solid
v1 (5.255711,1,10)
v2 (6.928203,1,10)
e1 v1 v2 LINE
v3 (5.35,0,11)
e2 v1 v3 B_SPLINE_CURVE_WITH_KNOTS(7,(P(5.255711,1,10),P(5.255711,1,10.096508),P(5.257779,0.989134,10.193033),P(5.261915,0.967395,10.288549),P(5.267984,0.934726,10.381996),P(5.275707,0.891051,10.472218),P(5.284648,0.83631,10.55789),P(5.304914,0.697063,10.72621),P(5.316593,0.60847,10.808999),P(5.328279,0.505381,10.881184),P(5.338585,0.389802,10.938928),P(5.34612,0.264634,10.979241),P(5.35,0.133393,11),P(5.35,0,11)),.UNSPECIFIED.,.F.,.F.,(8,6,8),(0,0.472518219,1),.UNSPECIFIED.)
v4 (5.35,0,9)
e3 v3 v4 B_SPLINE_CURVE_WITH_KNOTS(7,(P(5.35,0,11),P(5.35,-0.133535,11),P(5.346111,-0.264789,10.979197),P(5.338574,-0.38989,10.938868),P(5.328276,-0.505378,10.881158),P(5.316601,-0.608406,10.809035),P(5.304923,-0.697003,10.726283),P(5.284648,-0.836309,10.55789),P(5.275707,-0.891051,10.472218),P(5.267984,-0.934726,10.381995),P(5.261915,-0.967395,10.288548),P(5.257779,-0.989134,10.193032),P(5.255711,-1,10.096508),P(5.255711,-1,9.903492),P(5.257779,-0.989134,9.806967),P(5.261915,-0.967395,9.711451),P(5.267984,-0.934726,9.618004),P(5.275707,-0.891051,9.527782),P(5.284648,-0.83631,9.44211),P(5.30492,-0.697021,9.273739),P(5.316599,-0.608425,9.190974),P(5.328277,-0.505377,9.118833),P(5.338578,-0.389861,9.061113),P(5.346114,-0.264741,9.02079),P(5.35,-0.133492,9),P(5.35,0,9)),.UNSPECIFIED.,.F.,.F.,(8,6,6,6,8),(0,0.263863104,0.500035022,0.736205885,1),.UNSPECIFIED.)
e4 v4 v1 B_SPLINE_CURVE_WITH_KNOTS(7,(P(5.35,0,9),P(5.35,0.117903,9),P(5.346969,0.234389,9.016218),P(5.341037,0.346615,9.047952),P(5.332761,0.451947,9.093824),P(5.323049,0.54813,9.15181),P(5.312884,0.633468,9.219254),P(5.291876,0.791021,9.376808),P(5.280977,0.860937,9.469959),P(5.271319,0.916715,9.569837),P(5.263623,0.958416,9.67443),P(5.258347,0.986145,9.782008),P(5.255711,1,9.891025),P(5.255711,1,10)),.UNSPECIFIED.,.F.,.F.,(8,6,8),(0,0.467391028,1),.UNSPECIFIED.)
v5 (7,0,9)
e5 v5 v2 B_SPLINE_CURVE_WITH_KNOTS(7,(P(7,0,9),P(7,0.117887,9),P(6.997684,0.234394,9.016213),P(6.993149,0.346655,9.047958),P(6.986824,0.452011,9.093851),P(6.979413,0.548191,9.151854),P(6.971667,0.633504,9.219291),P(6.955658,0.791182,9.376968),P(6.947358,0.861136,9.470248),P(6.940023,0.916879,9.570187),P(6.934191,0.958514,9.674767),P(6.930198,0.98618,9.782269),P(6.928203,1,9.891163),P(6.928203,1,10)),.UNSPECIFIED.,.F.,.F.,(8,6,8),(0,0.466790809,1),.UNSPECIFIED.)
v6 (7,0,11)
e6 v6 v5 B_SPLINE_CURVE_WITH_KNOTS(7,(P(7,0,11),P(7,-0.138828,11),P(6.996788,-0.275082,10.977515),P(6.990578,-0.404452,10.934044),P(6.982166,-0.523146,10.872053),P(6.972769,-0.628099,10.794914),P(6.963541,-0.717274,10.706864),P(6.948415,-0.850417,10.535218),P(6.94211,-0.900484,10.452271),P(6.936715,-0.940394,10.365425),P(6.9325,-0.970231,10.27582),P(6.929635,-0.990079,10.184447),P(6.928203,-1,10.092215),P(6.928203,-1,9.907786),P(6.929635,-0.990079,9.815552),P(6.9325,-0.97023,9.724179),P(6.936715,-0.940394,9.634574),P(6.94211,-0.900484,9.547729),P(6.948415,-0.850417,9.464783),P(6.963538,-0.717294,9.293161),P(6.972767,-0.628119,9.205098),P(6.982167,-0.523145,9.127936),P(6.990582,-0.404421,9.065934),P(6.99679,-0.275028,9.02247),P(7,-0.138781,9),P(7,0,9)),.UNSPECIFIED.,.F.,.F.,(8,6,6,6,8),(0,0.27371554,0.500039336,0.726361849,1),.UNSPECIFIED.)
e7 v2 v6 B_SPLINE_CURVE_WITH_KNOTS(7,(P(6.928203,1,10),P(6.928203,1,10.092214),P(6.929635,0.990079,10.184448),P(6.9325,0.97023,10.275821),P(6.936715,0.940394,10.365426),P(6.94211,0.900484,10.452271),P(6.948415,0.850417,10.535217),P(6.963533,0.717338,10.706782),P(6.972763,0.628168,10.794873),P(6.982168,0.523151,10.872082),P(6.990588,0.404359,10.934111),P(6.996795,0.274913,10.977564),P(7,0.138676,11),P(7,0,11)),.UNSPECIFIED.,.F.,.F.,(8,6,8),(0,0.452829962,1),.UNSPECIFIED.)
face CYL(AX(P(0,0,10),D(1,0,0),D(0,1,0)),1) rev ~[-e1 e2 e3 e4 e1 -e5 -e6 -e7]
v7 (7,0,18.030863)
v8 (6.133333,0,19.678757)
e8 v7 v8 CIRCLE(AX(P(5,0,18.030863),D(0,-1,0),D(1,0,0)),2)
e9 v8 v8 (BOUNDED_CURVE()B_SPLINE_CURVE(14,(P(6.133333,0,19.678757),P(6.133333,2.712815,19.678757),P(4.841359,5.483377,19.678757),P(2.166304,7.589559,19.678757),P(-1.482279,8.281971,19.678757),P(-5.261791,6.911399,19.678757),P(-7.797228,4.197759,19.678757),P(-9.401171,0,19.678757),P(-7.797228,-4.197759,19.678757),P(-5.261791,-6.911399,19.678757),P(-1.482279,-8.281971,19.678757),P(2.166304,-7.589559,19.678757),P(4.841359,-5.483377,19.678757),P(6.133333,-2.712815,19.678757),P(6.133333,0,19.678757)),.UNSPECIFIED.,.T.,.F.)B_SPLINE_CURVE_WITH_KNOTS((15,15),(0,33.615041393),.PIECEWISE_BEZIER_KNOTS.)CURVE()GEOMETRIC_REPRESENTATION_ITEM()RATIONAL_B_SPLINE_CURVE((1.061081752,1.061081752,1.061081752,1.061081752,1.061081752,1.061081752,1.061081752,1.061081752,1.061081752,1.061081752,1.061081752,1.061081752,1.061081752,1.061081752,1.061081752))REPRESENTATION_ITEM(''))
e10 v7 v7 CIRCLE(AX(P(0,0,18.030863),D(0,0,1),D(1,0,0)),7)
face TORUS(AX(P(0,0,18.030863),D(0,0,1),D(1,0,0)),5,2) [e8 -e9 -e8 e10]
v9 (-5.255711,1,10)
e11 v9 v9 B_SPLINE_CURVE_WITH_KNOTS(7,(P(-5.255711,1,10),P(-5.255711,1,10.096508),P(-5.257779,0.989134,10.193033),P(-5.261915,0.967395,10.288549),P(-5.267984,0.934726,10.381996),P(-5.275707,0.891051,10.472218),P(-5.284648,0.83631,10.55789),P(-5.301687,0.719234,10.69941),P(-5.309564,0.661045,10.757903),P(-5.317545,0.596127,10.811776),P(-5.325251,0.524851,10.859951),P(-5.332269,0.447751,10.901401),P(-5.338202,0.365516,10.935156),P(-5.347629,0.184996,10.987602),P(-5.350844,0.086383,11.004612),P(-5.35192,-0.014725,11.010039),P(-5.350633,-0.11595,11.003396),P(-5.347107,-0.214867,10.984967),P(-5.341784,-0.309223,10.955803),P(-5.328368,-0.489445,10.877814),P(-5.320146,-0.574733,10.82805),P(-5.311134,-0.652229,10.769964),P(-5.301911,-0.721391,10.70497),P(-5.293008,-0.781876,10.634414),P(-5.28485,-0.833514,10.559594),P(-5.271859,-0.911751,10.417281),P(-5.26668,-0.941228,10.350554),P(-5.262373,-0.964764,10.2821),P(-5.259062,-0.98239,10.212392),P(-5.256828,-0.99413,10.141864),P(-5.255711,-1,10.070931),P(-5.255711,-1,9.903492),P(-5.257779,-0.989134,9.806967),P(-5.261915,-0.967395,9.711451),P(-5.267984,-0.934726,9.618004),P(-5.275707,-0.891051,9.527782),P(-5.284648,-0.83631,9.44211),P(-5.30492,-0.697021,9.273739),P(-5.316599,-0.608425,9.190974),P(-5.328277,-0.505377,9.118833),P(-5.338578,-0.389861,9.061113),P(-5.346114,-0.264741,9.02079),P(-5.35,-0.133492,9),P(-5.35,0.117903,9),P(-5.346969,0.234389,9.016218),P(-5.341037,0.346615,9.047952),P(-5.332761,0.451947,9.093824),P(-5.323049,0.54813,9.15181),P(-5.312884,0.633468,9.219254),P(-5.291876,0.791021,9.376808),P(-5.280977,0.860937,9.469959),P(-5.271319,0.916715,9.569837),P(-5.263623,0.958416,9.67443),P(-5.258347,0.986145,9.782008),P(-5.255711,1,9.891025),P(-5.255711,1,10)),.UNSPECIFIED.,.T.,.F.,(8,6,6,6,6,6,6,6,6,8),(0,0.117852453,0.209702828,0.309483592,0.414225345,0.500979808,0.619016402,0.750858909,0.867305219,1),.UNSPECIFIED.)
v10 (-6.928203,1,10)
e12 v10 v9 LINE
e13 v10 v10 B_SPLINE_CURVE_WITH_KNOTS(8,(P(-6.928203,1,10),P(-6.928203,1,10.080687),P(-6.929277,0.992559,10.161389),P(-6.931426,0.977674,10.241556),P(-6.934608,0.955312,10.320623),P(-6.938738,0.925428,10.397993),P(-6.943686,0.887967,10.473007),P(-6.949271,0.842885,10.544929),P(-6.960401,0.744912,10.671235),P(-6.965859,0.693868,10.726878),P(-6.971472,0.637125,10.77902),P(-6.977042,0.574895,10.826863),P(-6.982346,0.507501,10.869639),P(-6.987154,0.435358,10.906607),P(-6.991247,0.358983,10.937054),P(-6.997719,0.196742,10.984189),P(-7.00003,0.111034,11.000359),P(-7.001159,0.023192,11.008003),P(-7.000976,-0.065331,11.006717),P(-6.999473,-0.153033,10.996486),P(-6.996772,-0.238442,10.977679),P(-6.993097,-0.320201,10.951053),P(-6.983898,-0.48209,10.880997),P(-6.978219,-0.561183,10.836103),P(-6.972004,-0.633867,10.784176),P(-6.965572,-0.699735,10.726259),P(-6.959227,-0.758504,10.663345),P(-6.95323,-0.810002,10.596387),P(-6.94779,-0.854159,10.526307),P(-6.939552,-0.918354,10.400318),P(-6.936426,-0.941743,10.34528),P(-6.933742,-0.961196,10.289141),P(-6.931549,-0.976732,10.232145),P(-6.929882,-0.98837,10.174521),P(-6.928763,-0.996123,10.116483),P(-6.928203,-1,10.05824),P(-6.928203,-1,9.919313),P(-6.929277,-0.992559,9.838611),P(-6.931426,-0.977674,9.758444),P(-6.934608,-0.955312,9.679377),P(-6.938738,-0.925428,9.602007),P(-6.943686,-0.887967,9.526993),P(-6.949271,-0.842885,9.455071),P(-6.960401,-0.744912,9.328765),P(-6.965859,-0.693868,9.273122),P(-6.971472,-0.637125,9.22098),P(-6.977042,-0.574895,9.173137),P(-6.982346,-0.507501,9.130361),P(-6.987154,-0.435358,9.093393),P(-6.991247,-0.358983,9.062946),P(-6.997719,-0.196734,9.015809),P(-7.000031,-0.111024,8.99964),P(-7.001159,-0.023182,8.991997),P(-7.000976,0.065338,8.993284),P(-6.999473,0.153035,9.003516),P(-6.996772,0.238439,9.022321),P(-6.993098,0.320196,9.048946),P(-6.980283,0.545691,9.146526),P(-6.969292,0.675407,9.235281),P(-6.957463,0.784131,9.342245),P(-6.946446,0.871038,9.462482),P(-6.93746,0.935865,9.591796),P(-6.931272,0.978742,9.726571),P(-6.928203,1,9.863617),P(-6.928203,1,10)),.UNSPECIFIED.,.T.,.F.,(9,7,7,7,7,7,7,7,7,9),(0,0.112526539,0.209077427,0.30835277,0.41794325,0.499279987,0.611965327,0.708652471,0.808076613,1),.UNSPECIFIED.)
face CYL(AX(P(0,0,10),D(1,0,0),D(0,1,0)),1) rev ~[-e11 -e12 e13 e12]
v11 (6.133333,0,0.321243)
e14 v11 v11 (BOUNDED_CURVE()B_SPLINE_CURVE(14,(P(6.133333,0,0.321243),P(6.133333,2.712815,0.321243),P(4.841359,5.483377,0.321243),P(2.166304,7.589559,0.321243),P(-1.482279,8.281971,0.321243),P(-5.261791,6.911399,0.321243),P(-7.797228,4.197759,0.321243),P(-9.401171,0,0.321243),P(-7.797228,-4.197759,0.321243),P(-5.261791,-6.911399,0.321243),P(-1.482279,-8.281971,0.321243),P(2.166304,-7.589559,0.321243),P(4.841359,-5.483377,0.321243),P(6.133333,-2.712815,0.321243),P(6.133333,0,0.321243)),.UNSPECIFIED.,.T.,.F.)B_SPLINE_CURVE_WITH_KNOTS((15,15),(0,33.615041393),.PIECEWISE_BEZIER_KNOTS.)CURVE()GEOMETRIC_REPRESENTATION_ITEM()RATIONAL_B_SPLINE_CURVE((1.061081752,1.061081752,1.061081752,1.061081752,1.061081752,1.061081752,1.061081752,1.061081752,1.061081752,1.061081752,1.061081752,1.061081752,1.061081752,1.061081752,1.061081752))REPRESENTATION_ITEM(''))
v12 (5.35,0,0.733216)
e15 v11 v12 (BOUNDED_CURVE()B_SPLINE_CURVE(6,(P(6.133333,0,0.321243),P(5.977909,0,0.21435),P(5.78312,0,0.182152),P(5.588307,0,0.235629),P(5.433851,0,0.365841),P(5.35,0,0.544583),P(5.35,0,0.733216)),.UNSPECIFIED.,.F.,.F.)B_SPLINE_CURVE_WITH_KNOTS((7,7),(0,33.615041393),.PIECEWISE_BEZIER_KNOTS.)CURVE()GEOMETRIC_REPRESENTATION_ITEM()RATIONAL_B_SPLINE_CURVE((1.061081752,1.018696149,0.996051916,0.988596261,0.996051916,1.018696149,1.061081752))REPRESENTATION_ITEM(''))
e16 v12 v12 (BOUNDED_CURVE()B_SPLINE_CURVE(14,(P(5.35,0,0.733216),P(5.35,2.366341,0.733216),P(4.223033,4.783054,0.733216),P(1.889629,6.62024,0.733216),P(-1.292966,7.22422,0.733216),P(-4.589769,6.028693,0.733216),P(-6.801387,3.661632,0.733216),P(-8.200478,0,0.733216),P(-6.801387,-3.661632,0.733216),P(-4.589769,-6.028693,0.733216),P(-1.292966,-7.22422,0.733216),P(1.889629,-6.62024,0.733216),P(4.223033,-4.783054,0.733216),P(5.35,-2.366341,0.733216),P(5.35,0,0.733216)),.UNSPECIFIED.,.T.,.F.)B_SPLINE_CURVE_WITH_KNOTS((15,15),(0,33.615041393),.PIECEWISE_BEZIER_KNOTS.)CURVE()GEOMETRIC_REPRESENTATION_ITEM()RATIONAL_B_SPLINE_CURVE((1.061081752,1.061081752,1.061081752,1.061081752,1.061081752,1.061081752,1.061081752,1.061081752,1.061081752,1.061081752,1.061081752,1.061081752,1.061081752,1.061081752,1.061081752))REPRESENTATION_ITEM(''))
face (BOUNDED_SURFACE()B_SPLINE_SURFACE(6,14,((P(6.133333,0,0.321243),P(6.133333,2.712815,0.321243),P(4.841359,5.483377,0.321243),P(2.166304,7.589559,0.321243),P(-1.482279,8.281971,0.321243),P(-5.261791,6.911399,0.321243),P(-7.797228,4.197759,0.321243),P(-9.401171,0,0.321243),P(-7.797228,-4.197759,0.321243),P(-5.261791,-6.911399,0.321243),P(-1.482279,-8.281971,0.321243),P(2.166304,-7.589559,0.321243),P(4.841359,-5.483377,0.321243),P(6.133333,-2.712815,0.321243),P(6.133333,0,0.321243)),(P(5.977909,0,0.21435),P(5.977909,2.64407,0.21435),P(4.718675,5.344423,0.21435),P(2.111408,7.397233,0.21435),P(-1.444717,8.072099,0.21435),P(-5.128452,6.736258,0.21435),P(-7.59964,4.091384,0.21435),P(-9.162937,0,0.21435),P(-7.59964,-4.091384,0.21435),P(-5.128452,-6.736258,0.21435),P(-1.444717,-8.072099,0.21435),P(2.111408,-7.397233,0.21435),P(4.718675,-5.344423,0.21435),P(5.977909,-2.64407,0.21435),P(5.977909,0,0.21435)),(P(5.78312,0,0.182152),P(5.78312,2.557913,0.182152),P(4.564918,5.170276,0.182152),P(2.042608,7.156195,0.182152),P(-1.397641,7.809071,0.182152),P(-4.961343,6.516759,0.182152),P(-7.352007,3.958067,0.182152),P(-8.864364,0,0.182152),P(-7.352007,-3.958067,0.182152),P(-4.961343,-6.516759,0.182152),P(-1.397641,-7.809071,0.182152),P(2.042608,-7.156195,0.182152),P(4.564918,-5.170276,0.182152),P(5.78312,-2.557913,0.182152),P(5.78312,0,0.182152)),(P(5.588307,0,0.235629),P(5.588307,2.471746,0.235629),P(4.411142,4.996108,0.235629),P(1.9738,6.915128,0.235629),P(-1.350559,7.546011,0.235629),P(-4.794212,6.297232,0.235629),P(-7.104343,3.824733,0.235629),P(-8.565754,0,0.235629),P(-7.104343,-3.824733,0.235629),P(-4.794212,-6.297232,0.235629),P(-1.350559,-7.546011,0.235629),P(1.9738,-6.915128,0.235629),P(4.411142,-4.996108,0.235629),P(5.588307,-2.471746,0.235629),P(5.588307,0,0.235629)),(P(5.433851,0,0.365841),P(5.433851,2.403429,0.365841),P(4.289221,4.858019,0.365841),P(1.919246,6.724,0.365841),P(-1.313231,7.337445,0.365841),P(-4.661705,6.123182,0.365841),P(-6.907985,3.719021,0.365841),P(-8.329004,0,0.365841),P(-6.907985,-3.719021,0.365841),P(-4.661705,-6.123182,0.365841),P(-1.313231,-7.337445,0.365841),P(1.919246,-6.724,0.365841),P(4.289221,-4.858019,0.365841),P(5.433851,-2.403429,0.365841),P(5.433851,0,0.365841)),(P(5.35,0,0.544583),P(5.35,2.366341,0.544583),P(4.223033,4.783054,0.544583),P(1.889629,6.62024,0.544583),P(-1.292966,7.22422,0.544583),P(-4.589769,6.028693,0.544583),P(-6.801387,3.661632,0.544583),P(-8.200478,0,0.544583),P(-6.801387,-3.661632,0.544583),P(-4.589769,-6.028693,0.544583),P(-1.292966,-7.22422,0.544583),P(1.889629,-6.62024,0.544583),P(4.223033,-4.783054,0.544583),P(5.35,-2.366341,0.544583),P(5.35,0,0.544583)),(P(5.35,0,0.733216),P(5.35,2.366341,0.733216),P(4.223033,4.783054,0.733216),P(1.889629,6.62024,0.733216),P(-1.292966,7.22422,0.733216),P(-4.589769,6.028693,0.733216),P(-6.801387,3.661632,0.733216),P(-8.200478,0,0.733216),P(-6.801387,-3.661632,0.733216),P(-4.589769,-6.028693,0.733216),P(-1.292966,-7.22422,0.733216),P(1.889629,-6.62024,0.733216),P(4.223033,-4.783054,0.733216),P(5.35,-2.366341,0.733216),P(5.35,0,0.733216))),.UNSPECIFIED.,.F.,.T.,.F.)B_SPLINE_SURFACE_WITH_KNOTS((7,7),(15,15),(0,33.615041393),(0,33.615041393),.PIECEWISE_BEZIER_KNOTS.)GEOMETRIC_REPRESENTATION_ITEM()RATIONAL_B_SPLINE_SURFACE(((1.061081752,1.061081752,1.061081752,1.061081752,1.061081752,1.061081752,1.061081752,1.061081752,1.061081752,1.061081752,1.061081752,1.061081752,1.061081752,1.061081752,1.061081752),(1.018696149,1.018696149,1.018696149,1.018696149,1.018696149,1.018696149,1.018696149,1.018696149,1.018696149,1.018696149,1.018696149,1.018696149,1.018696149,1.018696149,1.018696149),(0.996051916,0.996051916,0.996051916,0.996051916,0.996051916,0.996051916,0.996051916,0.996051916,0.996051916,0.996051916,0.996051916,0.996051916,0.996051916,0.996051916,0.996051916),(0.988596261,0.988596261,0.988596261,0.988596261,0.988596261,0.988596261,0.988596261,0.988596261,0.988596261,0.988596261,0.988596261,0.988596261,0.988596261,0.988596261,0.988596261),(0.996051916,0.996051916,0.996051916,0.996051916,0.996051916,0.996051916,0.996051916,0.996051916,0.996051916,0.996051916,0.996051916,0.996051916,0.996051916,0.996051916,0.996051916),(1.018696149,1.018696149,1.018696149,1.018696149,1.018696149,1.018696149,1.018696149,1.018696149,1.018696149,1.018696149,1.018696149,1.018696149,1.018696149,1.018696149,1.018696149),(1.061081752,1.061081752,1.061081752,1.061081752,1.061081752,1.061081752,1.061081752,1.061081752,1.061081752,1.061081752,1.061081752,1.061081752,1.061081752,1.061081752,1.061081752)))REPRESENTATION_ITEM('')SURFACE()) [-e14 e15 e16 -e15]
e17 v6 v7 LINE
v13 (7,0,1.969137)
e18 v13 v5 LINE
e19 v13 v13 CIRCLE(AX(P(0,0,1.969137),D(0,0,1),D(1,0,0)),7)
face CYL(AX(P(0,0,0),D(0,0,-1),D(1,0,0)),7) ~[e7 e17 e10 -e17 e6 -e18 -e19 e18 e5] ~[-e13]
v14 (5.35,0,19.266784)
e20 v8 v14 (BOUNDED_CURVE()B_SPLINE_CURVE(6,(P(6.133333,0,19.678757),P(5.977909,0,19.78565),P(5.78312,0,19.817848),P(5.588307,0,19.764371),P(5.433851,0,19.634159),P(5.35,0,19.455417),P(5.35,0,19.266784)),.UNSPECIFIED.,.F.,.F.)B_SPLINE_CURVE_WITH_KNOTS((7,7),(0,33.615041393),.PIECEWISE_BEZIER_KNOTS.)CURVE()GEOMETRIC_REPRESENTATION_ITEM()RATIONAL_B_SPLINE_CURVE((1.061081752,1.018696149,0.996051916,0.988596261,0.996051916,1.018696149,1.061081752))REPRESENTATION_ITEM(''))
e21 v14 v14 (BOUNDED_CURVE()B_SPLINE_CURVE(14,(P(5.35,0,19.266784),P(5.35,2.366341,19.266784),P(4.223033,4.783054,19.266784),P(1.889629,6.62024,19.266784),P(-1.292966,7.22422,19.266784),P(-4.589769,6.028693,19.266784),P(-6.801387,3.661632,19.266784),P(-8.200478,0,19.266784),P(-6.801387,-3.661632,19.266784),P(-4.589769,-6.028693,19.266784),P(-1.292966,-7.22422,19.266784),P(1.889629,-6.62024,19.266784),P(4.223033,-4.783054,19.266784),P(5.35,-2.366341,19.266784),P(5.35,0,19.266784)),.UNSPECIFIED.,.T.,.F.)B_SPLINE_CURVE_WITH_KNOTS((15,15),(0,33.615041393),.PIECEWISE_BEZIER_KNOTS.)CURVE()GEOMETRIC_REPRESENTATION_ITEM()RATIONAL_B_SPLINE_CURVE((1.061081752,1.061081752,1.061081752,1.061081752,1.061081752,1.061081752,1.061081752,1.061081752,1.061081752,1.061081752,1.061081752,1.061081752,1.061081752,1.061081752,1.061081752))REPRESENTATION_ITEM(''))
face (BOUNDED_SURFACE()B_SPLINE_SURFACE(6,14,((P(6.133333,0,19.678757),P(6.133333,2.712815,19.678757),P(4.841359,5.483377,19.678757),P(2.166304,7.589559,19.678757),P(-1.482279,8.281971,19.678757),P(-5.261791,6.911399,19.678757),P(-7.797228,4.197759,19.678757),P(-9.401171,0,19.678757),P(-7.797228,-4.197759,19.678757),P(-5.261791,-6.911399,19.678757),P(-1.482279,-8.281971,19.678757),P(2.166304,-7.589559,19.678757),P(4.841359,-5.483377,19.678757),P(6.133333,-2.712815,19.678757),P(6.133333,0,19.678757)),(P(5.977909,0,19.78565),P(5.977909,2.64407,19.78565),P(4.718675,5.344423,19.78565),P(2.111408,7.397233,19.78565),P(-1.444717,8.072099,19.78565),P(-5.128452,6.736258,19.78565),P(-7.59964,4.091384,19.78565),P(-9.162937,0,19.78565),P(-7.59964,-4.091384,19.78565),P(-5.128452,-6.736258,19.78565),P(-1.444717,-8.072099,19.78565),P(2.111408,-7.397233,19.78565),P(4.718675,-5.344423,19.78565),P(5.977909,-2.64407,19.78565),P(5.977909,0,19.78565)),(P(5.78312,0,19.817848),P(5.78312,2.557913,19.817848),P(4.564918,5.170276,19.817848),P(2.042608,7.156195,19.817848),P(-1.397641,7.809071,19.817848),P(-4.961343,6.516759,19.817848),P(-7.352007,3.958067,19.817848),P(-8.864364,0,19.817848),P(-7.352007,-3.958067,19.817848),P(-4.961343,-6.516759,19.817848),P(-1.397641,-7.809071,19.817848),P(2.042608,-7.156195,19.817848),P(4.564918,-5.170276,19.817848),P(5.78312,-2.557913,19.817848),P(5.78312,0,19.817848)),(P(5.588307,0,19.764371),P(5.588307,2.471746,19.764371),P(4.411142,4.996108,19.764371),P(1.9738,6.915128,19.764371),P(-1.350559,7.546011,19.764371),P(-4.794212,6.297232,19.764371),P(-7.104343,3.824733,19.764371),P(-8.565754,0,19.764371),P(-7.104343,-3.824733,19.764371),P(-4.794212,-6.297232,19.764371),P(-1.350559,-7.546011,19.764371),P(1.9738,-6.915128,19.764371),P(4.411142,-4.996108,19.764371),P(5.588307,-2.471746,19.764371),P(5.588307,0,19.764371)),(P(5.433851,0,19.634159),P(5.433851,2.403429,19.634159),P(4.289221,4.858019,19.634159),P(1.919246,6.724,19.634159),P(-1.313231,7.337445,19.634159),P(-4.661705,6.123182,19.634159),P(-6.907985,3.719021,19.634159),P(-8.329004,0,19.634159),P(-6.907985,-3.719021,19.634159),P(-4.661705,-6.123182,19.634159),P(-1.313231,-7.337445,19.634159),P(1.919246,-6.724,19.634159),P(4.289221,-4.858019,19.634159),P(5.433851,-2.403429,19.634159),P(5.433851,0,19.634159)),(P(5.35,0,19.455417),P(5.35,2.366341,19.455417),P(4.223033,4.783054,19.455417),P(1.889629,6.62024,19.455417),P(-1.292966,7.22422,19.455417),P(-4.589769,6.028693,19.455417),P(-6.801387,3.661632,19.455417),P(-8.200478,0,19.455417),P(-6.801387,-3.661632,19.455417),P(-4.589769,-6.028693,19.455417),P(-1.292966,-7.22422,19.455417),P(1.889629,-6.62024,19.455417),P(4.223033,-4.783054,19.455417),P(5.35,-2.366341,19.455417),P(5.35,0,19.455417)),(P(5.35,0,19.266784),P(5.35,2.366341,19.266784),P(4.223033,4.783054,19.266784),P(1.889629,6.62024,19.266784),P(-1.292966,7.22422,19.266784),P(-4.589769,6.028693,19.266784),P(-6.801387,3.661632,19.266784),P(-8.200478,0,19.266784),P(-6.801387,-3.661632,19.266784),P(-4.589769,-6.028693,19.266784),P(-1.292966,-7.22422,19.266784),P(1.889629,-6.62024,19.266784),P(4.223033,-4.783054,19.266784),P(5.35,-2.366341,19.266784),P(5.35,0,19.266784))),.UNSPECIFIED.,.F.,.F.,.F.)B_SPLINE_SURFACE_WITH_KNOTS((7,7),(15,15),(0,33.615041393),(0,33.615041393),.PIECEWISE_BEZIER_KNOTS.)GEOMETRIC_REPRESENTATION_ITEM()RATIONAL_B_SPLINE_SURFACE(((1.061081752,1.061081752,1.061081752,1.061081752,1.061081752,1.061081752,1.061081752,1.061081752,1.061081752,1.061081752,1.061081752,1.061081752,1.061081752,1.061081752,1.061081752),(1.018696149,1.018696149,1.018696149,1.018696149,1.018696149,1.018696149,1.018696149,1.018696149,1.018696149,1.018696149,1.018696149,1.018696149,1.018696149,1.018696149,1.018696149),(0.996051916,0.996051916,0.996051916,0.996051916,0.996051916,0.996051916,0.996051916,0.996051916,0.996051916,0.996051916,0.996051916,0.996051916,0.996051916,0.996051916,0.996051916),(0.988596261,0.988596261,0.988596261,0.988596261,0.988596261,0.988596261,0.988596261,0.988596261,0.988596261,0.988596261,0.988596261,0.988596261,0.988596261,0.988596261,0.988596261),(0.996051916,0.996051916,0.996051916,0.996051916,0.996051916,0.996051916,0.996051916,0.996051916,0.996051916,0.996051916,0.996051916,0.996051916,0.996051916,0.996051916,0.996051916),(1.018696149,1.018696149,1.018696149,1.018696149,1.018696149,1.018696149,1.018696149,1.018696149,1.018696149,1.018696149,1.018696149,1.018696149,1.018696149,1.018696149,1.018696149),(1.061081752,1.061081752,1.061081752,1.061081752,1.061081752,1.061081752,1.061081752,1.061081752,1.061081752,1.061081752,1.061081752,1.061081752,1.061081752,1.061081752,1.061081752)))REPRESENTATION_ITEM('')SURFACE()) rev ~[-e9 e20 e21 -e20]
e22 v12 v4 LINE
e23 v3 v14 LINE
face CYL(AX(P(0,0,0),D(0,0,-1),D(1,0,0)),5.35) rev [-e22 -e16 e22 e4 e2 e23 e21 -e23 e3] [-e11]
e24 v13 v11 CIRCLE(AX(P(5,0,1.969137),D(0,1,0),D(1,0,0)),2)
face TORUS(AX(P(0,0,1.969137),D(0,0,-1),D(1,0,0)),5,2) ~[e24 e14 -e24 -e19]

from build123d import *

# Parameters (mm, degrees)
F0_R     = 7
F0_R_2   = 5.35
F1_DEPTH = 20
F2_R     = 1
F3_DEPTH = 12.5
F5_R     = 0.5


# Not quite as in the source:
# - a fillet or chamfer that OpenCascade refuses, or shapes differently, is made with other operations: its cross-section is extruded or revolved along the edge and cut away or added


with BuildPart() as f1:
    # F0 (on Top) → F1 (new body)
    with BuildSketch(Plane.XY):
        Circle(F0_R)
        Circle(F0_R_2, mode=Mode.SUBTRACT)
    extrude(amount=F1_DEPTH)

    # F2 (on Right) → F3 (cut, symmetric)
    with BuildSketch(Plane.YZ):
        with Locations((0, 10)):
            Circle(F2_R)
    extrude(amount=F3_DEPTH, both=True, mode=Mode.SUBTRACT)

    # F4: fillet of radius 2 on 2 edges, made by hand

    # F4_s1 → F4_t2 (revolve, cut)
    with BuildSketch(Plane.XZ):
        with BuildLine():
            ThreePointArc((7, 18.0308631332), (6.5329709717, 19.3153863911), (5.35, 20))
            Line((5.35, 20), (7, 20))
            Line((7, 20), (7, 18.0308631332))
        make_face()
    revolve(axis=Axis((0, 0, 20), (0, 0, 1)), mode=Mode.SUBTRACT)

    # F4_s3 → F4_t4 (revolve, cut)
    with BuildSketch(Plane.XZ):
        with BuildLine():
            ThreePointArc((7, 1.9691368668), (6.5329709717, 0.6846136089), (5.35, 0))
            Line((5.35, 0), (7, 0))
            Line((7, 0), (7, 1.9691368668))
        make_face()
    revolve(axis=Axis((0, 0, 0), (0, 0, 1)), mode=Mode.SUBTRACT)

    # F5
    f5_edges = [f1.edges().sort_by_distance(p)[0] for p in [
        (-5.35, 0, 20),
        (-5.35, 0, 0),
    ]]
    fillet(f5_edges, radius=F5_R)


solid = f1.part
